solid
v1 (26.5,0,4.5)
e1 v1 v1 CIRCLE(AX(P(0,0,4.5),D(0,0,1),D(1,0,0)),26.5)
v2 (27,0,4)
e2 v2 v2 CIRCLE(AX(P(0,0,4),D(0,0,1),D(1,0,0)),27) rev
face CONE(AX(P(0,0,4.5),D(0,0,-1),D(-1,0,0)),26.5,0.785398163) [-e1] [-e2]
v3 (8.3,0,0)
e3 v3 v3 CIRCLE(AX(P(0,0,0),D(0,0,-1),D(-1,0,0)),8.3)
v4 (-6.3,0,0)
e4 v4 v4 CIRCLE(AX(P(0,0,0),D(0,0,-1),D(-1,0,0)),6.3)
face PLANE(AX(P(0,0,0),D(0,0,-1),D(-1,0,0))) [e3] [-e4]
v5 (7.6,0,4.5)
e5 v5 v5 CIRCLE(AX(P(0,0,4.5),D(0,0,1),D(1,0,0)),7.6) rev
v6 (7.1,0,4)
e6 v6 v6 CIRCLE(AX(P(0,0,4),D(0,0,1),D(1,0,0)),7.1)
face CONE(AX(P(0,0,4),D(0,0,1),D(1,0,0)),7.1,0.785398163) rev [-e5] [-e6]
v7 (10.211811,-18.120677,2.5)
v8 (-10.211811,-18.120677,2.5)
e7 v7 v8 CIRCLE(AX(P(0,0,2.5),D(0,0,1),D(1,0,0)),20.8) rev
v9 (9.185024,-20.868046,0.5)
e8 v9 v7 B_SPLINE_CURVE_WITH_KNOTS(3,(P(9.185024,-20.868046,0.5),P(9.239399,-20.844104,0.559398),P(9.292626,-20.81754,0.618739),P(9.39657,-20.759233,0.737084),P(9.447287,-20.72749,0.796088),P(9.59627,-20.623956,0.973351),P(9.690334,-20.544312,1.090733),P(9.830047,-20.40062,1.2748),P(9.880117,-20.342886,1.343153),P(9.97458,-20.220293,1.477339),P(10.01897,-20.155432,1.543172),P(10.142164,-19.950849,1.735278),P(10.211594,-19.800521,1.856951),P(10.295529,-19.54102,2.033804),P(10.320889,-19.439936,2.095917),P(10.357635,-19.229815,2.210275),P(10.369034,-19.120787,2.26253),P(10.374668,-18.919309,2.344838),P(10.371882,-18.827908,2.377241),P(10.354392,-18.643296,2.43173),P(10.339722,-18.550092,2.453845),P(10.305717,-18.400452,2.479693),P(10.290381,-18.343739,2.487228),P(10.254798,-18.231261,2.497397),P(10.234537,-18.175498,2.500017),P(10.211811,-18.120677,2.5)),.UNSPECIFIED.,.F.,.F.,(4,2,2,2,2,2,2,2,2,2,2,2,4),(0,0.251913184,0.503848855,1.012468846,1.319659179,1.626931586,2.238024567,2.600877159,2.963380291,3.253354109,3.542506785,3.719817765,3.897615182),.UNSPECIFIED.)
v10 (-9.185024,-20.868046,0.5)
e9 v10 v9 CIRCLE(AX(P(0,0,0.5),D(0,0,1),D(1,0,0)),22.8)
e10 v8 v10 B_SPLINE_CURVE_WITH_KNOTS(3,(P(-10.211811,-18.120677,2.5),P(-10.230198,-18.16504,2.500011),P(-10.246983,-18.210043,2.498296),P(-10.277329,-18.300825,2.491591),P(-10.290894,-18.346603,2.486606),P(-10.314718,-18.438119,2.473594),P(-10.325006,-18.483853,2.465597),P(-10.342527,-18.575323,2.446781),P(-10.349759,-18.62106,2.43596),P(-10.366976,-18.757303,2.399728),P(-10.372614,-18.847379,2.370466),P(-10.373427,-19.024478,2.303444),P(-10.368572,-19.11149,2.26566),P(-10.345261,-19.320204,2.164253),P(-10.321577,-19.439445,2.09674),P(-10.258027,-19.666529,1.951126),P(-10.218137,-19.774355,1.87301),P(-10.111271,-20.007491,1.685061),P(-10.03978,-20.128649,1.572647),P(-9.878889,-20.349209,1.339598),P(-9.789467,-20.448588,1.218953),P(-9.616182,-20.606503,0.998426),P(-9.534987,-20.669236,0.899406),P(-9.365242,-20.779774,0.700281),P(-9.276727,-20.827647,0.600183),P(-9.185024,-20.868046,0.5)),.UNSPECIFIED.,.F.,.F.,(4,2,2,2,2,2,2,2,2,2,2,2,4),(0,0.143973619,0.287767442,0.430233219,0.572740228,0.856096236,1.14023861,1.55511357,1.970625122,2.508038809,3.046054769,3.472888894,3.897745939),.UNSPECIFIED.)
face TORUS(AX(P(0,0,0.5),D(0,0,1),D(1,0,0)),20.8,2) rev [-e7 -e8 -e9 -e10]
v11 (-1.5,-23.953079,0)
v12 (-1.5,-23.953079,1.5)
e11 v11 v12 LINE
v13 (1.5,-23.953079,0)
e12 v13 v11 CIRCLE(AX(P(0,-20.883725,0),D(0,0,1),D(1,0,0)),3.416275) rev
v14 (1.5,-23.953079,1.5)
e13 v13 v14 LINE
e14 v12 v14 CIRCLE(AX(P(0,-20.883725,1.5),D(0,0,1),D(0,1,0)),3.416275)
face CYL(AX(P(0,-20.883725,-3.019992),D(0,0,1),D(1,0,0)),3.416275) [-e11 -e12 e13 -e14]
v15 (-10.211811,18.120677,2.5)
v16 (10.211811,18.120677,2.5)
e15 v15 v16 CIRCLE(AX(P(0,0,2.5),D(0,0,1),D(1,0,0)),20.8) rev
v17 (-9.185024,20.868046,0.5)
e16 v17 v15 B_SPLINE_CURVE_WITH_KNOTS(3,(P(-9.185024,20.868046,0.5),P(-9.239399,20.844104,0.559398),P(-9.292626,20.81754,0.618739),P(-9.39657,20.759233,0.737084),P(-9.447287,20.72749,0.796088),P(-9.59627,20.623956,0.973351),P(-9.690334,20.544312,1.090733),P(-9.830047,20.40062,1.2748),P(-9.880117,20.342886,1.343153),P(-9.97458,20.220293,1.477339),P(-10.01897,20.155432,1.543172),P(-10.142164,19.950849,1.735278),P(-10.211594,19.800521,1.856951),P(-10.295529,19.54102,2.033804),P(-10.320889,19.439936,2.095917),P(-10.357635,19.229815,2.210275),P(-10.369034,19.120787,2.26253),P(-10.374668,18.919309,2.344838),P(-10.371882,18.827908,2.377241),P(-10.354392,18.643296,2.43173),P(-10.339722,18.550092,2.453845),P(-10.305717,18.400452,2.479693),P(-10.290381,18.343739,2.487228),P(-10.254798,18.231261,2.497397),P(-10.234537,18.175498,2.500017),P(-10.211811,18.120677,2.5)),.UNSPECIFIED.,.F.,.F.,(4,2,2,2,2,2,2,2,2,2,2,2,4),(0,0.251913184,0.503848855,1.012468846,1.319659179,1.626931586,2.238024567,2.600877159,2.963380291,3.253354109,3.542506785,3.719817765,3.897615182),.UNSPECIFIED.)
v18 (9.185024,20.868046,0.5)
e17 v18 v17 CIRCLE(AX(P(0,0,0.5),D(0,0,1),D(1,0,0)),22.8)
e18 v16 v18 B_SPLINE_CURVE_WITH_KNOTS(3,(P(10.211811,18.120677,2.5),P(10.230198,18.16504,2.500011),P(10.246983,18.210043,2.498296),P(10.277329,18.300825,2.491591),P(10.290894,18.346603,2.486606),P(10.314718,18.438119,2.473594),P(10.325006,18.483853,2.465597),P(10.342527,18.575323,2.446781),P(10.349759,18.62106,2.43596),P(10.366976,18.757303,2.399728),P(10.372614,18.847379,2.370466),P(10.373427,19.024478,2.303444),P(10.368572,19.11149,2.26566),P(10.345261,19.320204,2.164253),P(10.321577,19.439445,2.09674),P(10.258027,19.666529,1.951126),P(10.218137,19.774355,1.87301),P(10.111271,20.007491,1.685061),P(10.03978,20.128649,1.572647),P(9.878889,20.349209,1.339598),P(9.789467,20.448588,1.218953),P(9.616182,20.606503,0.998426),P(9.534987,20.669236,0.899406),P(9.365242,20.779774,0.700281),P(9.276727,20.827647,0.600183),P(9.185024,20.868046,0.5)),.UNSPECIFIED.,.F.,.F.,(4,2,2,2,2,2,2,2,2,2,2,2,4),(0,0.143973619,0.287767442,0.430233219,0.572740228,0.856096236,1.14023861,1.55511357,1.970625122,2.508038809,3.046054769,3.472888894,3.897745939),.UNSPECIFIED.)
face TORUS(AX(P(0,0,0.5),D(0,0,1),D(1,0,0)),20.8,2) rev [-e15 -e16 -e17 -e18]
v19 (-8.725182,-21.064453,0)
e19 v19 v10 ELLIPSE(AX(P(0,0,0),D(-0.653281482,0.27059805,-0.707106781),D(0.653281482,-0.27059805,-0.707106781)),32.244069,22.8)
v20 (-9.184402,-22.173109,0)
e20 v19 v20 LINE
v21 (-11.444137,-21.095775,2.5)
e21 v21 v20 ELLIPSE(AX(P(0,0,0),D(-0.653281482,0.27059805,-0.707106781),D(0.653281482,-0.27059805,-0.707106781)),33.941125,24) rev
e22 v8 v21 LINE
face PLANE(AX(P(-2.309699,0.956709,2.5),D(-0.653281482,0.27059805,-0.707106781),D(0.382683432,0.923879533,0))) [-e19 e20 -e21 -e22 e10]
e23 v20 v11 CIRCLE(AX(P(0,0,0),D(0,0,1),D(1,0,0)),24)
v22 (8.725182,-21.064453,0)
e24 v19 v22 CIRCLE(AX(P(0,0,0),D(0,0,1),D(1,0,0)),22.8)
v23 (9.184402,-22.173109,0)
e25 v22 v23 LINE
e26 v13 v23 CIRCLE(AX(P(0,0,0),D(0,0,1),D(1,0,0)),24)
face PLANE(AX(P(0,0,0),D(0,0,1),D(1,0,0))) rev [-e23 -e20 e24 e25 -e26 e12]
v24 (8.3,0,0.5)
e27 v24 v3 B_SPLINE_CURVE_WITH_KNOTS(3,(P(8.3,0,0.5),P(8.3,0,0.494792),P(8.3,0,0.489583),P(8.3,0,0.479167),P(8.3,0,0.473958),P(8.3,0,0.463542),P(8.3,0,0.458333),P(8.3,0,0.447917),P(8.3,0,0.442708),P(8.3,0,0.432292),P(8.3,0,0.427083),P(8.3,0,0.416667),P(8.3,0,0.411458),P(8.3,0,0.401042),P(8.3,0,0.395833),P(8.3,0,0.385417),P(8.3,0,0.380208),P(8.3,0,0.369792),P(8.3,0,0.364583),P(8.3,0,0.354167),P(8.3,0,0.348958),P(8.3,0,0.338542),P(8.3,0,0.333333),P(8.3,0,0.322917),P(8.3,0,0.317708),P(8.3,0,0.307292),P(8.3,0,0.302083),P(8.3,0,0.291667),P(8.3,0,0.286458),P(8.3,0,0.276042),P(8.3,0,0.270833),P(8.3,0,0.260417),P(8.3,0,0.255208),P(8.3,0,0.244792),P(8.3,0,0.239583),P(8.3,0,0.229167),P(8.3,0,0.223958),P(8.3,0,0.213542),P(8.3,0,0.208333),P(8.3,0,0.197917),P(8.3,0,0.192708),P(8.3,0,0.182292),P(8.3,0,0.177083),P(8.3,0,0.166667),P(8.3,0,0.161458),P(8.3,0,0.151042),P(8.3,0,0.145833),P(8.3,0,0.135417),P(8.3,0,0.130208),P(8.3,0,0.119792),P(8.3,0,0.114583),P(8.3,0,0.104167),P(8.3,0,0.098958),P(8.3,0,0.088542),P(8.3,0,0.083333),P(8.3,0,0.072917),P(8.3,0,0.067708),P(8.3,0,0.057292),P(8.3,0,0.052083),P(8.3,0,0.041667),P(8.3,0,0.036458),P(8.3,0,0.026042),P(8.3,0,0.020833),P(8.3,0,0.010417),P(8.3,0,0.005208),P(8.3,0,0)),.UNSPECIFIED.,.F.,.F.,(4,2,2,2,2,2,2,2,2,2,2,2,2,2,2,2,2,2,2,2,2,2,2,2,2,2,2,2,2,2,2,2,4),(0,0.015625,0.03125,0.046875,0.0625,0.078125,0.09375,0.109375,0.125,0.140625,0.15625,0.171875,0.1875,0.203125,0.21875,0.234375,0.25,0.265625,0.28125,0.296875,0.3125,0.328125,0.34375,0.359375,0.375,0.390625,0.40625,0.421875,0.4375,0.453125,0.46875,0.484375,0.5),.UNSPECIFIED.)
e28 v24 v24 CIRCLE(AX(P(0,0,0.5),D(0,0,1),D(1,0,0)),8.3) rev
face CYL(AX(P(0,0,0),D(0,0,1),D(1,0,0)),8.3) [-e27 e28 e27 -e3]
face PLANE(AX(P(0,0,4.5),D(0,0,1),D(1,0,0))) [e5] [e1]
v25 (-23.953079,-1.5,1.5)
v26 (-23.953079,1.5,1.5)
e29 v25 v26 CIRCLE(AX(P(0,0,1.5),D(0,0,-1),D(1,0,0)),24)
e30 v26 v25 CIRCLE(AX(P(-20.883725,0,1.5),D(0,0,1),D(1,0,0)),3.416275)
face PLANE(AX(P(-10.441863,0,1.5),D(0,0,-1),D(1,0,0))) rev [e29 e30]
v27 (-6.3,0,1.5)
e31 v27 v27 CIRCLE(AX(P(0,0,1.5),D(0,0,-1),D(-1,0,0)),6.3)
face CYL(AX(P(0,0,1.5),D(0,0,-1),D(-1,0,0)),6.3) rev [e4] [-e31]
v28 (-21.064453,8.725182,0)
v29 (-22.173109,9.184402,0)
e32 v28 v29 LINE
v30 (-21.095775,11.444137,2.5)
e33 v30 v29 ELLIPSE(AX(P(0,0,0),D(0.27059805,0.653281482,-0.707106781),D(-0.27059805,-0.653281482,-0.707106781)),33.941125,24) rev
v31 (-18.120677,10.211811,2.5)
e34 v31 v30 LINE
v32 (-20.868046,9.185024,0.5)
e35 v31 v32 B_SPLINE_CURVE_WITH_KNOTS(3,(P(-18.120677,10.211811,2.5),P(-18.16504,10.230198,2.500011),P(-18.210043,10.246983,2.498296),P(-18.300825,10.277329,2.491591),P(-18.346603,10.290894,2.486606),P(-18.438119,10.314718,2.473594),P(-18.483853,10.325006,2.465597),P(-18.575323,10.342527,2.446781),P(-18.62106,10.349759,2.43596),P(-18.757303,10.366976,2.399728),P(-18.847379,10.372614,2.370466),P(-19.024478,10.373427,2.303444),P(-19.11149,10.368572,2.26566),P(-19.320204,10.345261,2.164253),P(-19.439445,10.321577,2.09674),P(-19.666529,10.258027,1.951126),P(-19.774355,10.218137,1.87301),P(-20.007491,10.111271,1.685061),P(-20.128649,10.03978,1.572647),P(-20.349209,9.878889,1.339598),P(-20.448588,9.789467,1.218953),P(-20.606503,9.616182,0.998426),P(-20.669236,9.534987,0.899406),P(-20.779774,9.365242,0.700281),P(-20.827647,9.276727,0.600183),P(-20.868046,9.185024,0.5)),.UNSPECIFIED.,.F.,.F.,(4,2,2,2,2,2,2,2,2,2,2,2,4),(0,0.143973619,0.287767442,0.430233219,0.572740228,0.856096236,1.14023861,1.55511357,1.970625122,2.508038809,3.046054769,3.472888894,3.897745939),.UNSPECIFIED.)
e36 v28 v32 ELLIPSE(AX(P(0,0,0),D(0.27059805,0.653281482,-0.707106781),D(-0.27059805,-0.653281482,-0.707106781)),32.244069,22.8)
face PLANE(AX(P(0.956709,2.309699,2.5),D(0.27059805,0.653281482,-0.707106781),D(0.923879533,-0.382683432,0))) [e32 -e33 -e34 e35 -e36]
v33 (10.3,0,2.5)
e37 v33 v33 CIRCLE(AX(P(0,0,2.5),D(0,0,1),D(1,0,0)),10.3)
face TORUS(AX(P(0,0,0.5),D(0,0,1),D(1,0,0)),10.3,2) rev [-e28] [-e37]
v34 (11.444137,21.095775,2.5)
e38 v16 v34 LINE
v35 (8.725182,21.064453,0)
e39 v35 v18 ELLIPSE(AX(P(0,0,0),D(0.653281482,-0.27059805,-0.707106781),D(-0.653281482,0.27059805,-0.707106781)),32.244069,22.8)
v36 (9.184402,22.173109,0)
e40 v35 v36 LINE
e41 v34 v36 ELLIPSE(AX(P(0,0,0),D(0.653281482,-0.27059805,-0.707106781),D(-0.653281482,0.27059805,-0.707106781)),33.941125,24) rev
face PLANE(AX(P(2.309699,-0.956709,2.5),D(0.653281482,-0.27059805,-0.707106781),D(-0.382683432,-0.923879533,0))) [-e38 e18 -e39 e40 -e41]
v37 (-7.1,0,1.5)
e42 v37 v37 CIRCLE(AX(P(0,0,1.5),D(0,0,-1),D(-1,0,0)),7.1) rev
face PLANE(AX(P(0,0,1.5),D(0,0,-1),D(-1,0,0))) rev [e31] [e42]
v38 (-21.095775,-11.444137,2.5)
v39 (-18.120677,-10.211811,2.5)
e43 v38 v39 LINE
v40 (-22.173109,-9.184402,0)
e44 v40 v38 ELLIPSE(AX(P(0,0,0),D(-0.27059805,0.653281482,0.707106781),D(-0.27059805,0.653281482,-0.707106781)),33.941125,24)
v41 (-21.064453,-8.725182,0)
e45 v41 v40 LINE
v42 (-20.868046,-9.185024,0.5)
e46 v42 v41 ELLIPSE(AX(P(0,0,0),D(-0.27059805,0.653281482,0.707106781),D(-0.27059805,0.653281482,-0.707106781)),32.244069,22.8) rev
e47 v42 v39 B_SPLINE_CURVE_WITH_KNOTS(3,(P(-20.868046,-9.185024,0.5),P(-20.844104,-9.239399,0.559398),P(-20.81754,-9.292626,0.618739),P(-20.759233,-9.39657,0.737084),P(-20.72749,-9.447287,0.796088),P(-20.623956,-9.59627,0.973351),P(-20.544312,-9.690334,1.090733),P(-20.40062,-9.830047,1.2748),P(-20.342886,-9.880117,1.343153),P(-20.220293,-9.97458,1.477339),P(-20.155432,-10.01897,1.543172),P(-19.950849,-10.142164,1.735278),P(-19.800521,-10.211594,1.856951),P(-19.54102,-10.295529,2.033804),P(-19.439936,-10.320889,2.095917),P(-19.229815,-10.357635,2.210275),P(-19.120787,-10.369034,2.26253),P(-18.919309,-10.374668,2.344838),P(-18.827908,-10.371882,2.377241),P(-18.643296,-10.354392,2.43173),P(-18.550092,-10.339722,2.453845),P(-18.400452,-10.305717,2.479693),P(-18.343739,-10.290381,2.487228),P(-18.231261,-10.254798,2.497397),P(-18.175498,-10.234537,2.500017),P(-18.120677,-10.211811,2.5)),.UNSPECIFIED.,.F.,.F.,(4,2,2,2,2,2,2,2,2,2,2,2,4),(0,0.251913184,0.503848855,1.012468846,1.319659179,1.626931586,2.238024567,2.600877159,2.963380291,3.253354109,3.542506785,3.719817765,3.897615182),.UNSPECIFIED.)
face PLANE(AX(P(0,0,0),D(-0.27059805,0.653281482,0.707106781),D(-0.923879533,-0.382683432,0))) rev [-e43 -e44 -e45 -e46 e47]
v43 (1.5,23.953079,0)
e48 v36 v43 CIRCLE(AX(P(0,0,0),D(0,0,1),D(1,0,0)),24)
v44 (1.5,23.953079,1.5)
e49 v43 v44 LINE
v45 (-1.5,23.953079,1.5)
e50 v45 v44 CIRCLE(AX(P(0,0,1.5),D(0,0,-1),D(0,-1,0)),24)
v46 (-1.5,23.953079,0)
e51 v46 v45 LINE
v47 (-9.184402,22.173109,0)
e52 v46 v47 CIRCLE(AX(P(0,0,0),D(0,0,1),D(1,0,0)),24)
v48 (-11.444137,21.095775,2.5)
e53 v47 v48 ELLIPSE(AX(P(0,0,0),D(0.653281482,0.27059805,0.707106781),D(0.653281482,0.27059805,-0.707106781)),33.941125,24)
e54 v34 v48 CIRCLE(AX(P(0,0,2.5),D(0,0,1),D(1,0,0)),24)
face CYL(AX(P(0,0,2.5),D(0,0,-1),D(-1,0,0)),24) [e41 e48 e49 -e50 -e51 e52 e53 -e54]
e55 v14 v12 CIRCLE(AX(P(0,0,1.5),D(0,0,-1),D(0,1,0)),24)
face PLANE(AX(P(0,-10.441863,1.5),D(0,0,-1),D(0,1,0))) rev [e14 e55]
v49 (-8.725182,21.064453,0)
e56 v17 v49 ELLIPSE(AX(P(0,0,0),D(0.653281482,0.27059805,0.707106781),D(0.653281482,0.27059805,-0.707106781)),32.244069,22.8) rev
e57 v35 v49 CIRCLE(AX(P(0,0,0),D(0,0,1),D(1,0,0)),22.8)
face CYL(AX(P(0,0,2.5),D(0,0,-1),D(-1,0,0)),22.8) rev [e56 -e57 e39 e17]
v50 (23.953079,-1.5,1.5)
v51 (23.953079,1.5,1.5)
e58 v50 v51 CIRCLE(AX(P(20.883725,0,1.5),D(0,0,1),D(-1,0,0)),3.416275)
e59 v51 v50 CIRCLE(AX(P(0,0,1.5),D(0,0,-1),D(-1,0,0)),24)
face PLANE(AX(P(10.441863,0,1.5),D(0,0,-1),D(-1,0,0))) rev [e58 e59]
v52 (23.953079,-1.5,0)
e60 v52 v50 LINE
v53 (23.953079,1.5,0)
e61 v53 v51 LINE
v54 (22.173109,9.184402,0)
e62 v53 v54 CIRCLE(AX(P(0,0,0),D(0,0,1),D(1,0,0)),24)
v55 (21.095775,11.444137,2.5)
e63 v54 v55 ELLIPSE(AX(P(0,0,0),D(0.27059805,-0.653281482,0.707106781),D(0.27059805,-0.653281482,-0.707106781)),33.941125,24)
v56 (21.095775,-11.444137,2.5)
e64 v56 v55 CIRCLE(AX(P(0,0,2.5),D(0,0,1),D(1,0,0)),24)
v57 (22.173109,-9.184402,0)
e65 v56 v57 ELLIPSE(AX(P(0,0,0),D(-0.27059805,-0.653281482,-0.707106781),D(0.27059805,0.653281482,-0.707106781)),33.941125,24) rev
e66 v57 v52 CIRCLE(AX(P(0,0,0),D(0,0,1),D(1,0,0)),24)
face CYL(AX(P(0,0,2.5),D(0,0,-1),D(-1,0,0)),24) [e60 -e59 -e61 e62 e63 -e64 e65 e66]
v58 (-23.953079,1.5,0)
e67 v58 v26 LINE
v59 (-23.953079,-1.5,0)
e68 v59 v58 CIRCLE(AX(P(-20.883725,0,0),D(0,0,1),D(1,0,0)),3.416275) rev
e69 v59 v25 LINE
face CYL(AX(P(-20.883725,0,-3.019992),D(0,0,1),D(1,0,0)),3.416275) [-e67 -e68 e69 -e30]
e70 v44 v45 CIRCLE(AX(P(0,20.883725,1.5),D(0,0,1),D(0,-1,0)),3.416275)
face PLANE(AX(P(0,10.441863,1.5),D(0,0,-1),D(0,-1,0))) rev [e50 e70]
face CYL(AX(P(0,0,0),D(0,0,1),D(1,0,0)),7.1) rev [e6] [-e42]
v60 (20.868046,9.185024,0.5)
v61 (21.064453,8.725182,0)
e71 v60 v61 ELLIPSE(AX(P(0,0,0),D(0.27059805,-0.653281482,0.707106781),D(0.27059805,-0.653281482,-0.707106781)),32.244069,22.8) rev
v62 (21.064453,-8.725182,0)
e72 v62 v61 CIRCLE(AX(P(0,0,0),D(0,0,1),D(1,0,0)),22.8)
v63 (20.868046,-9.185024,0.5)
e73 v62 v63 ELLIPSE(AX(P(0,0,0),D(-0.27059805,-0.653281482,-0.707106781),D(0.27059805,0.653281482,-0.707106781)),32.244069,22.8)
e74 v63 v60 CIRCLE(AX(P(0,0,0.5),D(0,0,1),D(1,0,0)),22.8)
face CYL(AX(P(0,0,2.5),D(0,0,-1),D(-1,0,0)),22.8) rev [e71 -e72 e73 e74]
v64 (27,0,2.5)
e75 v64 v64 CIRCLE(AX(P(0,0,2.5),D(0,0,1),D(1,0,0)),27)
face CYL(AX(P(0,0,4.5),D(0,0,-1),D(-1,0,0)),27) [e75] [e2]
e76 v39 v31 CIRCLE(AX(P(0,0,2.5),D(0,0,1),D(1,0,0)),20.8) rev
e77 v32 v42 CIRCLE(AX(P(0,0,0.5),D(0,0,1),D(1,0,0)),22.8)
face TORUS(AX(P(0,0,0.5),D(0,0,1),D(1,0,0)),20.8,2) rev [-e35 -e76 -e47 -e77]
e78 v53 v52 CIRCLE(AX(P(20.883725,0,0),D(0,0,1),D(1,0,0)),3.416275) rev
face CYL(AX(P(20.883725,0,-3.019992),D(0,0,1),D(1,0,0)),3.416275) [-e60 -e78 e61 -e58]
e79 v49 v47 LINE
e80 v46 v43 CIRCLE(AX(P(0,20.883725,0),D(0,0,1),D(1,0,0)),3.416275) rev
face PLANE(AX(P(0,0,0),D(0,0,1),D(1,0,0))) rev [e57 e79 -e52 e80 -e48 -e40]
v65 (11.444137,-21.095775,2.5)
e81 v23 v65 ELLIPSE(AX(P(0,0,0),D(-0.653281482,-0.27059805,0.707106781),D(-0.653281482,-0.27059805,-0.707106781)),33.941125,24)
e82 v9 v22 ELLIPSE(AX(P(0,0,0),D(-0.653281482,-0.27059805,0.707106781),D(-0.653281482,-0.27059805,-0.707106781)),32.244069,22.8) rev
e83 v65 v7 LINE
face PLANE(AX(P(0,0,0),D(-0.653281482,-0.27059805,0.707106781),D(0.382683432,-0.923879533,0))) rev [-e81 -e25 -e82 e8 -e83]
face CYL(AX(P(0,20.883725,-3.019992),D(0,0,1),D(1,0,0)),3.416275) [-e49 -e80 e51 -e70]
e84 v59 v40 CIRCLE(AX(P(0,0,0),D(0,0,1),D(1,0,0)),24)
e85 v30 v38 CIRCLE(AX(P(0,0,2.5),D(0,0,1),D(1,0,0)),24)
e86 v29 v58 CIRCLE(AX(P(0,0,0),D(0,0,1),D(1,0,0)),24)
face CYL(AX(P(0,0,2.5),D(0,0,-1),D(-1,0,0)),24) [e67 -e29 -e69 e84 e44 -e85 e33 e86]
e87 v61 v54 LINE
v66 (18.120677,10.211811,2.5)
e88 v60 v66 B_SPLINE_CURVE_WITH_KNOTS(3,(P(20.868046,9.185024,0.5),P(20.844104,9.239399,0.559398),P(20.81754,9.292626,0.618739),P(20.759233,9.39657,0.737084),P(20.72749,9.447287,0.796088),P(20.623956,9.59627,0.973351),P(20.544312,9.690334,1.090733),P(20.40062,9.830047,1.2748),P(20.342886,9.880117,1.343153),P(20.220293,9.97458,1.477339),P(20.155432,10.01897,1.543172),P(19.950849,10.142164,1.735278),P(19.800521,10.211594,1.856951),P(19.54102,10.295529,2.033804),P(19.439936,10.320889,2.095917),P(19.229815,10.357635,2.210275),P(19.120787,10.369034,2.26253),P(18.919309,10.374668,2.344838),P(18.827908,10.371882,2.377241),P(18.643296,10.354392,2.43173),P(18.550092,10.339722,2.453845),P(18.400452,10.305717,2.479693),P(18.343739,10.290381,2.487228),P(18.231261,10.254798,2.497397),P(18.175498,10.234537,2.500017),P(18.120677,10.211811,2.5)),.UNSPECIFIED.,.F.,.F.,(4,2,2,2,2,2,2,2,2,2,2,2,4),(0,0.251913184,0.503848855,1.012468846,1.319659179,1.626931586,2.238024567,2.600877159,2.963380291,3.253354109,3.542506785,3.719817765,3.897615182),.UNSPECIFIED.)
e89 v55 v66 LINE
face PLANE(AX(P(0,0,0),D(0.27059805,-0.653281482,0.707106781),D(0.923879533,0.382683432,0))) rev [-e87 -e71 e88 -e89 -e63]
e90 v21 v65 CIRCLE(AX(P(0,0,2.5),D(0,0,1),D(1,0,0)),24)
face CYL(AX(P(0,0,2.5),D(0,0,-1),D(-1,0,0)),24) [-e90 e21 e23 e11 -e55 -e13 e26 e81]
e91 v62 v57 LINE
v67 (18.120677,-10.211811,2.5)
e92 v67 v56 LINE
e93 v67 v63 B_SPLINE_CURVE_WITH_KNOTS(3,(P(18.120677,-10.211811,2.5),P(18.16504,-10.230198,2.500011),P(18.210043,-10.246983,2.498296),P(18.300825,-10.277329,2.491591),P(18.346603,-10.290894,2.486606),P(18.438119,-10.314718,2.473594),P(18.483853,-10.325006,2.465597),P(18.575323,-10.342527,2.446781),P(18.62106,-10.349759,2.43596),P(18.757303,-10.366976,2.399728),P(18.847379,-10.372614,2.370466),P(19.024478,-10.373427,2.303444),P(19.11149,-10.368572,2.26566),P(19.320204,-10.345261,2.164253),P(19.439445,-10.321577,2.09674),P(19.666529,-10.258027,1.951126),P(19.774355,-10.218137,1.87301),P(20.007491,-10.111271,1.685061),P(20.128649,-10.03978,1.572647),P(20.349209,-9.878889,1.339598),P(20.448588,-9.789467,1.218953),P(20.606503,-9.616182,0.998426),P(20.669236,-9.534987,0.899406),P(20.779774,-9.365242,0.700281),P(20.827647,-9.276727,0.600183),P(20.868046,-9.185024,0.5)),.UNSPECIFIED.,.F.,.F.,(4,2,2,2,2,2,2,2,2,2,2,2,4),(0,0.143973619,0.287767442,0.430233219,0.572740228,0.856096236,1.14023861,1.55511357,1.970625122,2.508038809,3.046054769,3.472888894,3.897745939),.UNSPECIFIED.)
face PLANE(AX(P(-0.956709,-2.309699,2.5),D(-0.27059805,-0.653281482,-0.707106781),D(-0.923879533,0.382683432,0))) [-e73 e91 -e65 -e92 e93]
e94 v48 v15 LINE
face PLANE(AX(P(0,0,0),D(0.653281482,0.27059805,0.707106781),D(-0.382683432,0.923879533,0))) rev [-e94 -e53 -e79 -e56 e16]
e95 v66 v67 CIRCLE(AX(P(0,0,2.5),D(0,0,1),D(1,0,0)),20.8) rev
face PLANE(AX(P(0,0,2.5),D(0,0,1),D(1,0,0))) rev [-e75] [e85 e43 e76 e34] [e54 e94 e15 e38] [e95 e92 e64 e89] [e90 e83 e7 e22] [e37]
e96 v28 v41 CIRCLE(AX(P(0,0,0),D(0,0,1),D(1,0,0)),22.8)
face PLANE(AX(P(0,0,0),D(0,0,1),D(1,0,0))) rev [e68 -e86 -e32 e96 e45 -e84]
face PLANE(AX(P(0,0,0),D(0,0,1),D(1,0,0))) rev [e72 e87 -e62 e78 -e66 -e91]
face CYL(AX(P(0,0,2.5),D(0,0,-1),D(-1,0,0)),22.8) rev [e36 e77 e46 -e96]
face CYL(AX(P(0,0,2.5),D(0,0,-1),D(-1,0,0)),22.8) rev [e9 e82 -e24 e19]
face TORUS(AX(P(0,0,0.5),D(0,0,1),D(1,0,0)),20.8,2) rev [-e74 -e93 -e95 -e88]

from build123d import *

# Parameters (mm, degrees)
SKETCH1_R                    = 24
SKETCH1_R_2                  = 22.8
BOSS_EXTRUDE1_DEPTH          = 2.5
BOSS_EXTRUDE5_START          = -2.5
BOSS_EXTRUDE5_DEPTH          = 1.5
CIRPATTERN1_COUNT            = 4
SKETCH2_R                    = 27
BOSS_EXTRUDE2_DEPTH          = 2
SKETCH3_R                    = 7.1
CUT_EXTRUDE1_DEPTH           = 39.448016854
SKETCH4_R                    = 8.3
SKETCH4_R_2                  = 7.1
BOSS_EXTRUDE3_DEPTH          = 2.5
BOSS_EXTRUDE4_START          = -1.5
SKETCH5_R                    = 8.3
SKETCH5_R_2                  = 6.3
BOSS_EXTRUDE4_DEPTH          = 1.5
CUT_EXTRUDE2_DEPTH           = 2.5
CHAMFER2_SIZE                = 2.5
CIRPATTERN2_COUNT            = 4
CHAMFER2_OF_CIRPATTERN2_SIZE = 2.5
FILLET1_R                    = 2
CHAMFER1_SIZE                = 0.5


# Some blends are built 0.0001 mm under size
with BuildPart() as part:
    # Sketch1 → Boss-Extrude1 (new body)
    with BuildSketch(Plane.XY):
        Circle(SKETCH1_R)
        Circle(SKETCH1_R_2, mode=Mode.SUBTRACT)
    extrude(amount=BOSS_EXTRUDE1_DEPTH)

    # Sketch6 → Boss-Extrude5 (add)
    with BuildSketch(Plane.XY.offset(2.5).offset(BOSS_EXTRUDE5_START)):
        with BuildLine():
            ThreePointArc((23.953079134, 1.5), (24, 0), (23.953079134, -1.5))
            ThreePointArc((23.953079134, -1.5), (24.3, 0), (23.953079134, 1.5))
        make_face()
    boss_extrude5 = extrude(amount=BOSS_EXTRUDE5_DEPTH)

    # CirPattern1: Boss-Extrude5 ×4 about axis
    cirpattern1_axis = Axis((0, 0, 0), (0, 0, 1))
    for i in range(1, CIRPATTERN1_COUNT):
        add(boss_extrude5.rotate(cirpattern1_axis, i * 360 / CIRPATTERN1_COUNT))

    # Sketch2 → Boss-Extrude2 (add)
    with BuildSketch(Plane.XY.offset(2.5)):
        Circle(SKETCH2_R)
    extrude(amount=BOSS_EXTRUDE2_DEPTH)

    # Sketch3 → Cut-Extrude1 (cut, through all)
    with BuildSketch(Plane.XY.offset(4.5)):
        Circle(SKETCH3_R)
    extrude(amount=-CUT_EXTRUDE1_DEPTH, mode=Mode.SUBTRACT)

    # Sketch4 → Boss-Extrude3 (add, through all)
    with BuildSketch(Plane(origin=(0, 0, 2.5), x_dir=(-1, 0, 0), z_dir=(0, 0, -1))):
        with Locations(Location((0, 0, 0), (0, 0, 180))):
            Circle(SKETCH4_R)
        with Locations(Location((0, 0, 0), (0, 0, 180))):
            Circle(SKETCH4_R_2, mode=Mode.SUBTRACT)
    extrude(amount=BOSS_EXTRUDE3_DEPTH)

    # Sketch5 → Boss-Extrude4 (add)
    with BuildSketch(Plane(origin=(0, 0, 0), x_dir=(-1, 0, 0), z_dir=(0, 0, -1)).offset(BOSS_EXTRUDE4_START)):
        with Locations(Location((0, 0, 0), (0, 0, 180))):
            Circle(SKETCH5_R)
        Circle(SKETCH5_R_2, mode=Mode.SUBTRACT)
    extrude(amount=BOSS_EXTRUDE4_DEPTH)

    # Sketch7 → Cut-Extrude2 (cut)
    with BuildSketch(Plane(origin=(0, 0, 0), x_dir=(-1, 0, 0), z_dir=(0, 0, -1))):
        with BuildLine():
            ThreePointArc((8.725182258, 21.064453341), (12.667001313, 18.95750716), (16.122034611, 16.122034611))
            Line((16.122034611, 16.122034611), (16.970562748, 16.970562748))
            ThreePointArc((16.970562748, 16.970562748), (13.333685592, 19.955270695), (9.184402377, 22.17310878))
            Line((9.184402377, 22.17310878), (8.725182258, 21.064453341))
        make_face()
        with BuildLine():
            Line((16.970562748, 16.970562748), (16.122034611, 16.122034611))
            ThreePointArc((16.122034611, 16.122034611), (18.95750716, 12.667001313), (21.064453341, 8.725182258))
            Line((21.064453341, 8.725182258), (22.17310878, 9.184402377))
            ThreePointArc((22.17310878, 9.184402377), (19.955270695, 13.333685592), (16.970562748, 16.970562748))
        make_face()
    cut_extrude2 = extrude(amount=-CUT_EXTRUDE2_DEPTH, mode=Mode.SUBTRACT)

    # Chamfer2
    chamfer2_edges = [part.edges().sort_by_distance(p)[0] for p in [
        (-21.618781061, 8.954792317, 2.5),
        (-8.954792317, 21.618781061, 2.5),
    ]]
    chamfer(chamfer2_edges, length=CHAMFER2_SIZE - 0.0001)  # a hair under: the kernel refuses the full size

    # CirPattern2: Cut-Extrude2 ×4 about axis
    cirpattern2_axis = Axis((0, 0, 0), (0, 0, 1))
    for i in range(1, CIRPATTERN2_COUNT):
        add(cut_extrude2.rotate(cirpattern2_axis, i * 360 / CIRPATTERN2_COUNT), mode=Mode.SUBTRACT)

    # Chamfer2 of CirPattern2
    chamfer2_of_cirpattern2_edges = [part.edges().sort_by_distance(p)[0] for p in [
        (-8.954792317, -21.618781061, 2.5),
        (-21.618781061, -8.954792317, 2.5),
        (21.618781061, -8.954792317, 2.5),
        (8.954792317, -21.618781061, 2.5),
        (8.954792317, 21.618781061, 2.5),
        (21.618781061, 8.954792317, 2.5),
    ]]
    chamfer(chamfer2_of_cirpattern2_edges, length=CHAMFER2_OF_CIRPATTERN2_SIZE - 0.0001)  # a hair under: the kernel refuses the full size

    # Fillet1
    # the kernel refuses this fillet: 2 mm, written as the material it adds along each edge
    with BuildSketch(Plane(origin=(0, 0, 2.5), x_dir=(1, 0, 0), z_dir=(0, 1, 0))) as fillet1_piece_1:
        with BuildLine():
            CenterArc((8.3 + FILLET1_R, FILLET1_R), FILLET1_R, 180, 90)
            Line((8.3, FILLET1_R), (8.3, 0))
            Line((8.3, 0), (8.3 + FILLET1_R, 0))
        make_face()
    revolve(axis=Axis((0, 0, 2.5), (0, 0, -1)))
    with BuildSketch(Plane(origin=(0, 0, 2.5), x_dir=(0.6608111736340745, -0.7505521919229581, 0), z_dir=(0.7505521919229581, 0.6608111736340745, 0))) as fillet1_piece_2_section:
        with BuildLine():
            CenterArc((22.8 - FILLET1_R, FILLET1_R), FILLET1_R, 270, 90)
            Line((22.8, FILLET1_R), (22.8, 0))
            Line((22.8, 0), (22.8 - FILLET1_R, 0))
        make_face()
    fillet1_piece_2 = revolve(axis=Axis((0, 0, 2.5), (0, 0, -1)), revolution_arc=82.723533759, mode=Mode.PRIVATE)
    fillet1_piece_2 = split(fillet1_piece_2, bisect_by=Plane(origin=(-4.823831946, -20.235955974, -3.287225486), z_dir=(0.653281482438186, -0.27059805007310406, 0.7071067811865476)), keep=Keep.TOP, mode=Mode.PRIVATE)
    fillet1_piece_2 = split(fillet1_piece_2, bisect_by=Plane(origin=(4.823831946, -20.235955974, -3.287225486), z_dir=(-0.6532814824381898, -0.2705980500730944, 0.7071067811865478)), keep=Keep.TOP, mode=Mode.PRIVATE)
    add(fillet1_piece_2)
    with BuildSketch(Plane(origin=(0, 0, 2.5), x_dir=(0.7505521919229583, 0.6608111736340745, 0), z_dir=(-0.6608111736340745, 0.7505521919229583, 0))) as fillet1_piece_3_section:
        with BuildLine():
            CenterArc((22.8 - FILLET1_R, FILLET1_R), FILLET1_R, 270, 90)
            Line((22.8, FILLET1_R), (22.8, 0))
            Line((22.8, 0), (22.8 - FILLET1_R, 0))
        make_face()
    fillet1_piece_3 = revolve(axis=Axis((0, 0, 2.5), (0, 0, -1)), revolution_arc=82.723533759, mode=Mode.PRIVATE)
    fillet1_piece_3 = split(fillet1_piece_3, bisect_by=Plane(origin=(20.235955974, -4.823831946, -3.287225486), z_dir=(0.2705980500731041, 0.6532814824381858, 0.7071067811865477)), keep=Keep.TOP, mode=Mode.PRIVATE)
    fillet1_piece_3 = split(fillet1_piece_3, bisect_by=Plane(origin=(20.235955974, 4.823831946, -3.287225486), z_dir=(0.27059805007309445, -0.6532814824381898, 0.7071067811865478)), keep=Keep.TOP, mode=Mode.PRIVATE)
    add(fillet1_piece_3)
    with BuildSketch(Plane(origin=(0, 0, 2.5), x_dir=(-0.750552191922958, -0.6608111736340746, 0), z_dir=(0.6608111736340746, -0.750552191922958, 0))) as fillet1_piece_4_section:
        with BuildLine():
            CenterArc((22.8 - FILLET1_R, FILLET1_R), FILLET1_R, 270, 90)
            Line((22.8, FILLET1_R), (22.8, 0))
            Line((22.8, 0), (22.8 - FILLET1_R, 0))
        make_face()
    fillet1_piece_4 = revolve(axis=Axis((0, 0, 2.5), (0, 0, -1)), revolution_arc=82.723533759, mode=Mode.PRIVATE)
    fillet1_piece_4 = split(fillet1_piece_4, bisect_by=Plane(origin=(-20.235955974, 4.823831946, -3.287225486), z_dir=(-0.2705980500731042, -0.6532814824381858, 0.7071067811865477)), keep=Keep.TOP, mode=Mode.PRIVATE)
    fillet1_piece_4 = split(fillet1_piece_4, bisect_by=Plane(origin=(-20.235955974, -4.823831946, -3.287225486), z_dir=(-0.2705980500730945, 0.6532814824381897, 0.7071067811865478)), keep=Keep.TOP, mode=Mode.PRIVATE)
    add(fillet1_piece_4)
    with BuildSketch(Plane(origin=(0, 0, 2.5), x_dir=(-0.6608111736340749, 0.7505521919229577, 0), z_dir=(-0.7505521919229577, -0.6608111736340749, 0))) as fillet1_piece_5_section:
        with BuildLine():
            CenterArc((22.8 - FILLET1_R, FILLET1_R), FILLET1_R, 270, 90)
            Line((22.8, FILLET1_R), (22.8, 0))
            Line((22.8, 0), (22.8 - FILLET1_R, 0))
        make_face()
    fillet1_piece_5 = revolve(axis=Axis((0, 0, 2.5), (0, 0, -1)), revolution_arc=82.723533759, mode=Mode.PRIVATE)
    fillet1_piece_5 = split(fillet1_piece_5, bisect_by=Plane(origin=(-4.823831946, 20.235955974, -3.287225486), z_dir=(0.6532814824381898, 0.2705980500730944, 0.7071067811865478)), keep=Keep.TOP, mode=Mode.PRIVATE)
    fillet1_piece_5 = split(fillet1_piece_5, bisect_by=Plane(origin=(4.823831946, 20.235955974, -3.287225486), z_dir=(-0.6532814824381858, 0.2705980500731041, 0.7071067811865477)), keep=Keep.TOP, mode=Mode.PRIVATE)
    add(fillet1_piece_5)

    # Chamfer1
    chamfer1_edges = [part.edges().sort_by_distance(p)[0] for p in [
        (-27, 0, 4.5),
        (-7.1, 0, 4.5),
    ]]
    chamfer(chamfer1_edges, length=CHAMFER1_SIZE)


solid = part.part
